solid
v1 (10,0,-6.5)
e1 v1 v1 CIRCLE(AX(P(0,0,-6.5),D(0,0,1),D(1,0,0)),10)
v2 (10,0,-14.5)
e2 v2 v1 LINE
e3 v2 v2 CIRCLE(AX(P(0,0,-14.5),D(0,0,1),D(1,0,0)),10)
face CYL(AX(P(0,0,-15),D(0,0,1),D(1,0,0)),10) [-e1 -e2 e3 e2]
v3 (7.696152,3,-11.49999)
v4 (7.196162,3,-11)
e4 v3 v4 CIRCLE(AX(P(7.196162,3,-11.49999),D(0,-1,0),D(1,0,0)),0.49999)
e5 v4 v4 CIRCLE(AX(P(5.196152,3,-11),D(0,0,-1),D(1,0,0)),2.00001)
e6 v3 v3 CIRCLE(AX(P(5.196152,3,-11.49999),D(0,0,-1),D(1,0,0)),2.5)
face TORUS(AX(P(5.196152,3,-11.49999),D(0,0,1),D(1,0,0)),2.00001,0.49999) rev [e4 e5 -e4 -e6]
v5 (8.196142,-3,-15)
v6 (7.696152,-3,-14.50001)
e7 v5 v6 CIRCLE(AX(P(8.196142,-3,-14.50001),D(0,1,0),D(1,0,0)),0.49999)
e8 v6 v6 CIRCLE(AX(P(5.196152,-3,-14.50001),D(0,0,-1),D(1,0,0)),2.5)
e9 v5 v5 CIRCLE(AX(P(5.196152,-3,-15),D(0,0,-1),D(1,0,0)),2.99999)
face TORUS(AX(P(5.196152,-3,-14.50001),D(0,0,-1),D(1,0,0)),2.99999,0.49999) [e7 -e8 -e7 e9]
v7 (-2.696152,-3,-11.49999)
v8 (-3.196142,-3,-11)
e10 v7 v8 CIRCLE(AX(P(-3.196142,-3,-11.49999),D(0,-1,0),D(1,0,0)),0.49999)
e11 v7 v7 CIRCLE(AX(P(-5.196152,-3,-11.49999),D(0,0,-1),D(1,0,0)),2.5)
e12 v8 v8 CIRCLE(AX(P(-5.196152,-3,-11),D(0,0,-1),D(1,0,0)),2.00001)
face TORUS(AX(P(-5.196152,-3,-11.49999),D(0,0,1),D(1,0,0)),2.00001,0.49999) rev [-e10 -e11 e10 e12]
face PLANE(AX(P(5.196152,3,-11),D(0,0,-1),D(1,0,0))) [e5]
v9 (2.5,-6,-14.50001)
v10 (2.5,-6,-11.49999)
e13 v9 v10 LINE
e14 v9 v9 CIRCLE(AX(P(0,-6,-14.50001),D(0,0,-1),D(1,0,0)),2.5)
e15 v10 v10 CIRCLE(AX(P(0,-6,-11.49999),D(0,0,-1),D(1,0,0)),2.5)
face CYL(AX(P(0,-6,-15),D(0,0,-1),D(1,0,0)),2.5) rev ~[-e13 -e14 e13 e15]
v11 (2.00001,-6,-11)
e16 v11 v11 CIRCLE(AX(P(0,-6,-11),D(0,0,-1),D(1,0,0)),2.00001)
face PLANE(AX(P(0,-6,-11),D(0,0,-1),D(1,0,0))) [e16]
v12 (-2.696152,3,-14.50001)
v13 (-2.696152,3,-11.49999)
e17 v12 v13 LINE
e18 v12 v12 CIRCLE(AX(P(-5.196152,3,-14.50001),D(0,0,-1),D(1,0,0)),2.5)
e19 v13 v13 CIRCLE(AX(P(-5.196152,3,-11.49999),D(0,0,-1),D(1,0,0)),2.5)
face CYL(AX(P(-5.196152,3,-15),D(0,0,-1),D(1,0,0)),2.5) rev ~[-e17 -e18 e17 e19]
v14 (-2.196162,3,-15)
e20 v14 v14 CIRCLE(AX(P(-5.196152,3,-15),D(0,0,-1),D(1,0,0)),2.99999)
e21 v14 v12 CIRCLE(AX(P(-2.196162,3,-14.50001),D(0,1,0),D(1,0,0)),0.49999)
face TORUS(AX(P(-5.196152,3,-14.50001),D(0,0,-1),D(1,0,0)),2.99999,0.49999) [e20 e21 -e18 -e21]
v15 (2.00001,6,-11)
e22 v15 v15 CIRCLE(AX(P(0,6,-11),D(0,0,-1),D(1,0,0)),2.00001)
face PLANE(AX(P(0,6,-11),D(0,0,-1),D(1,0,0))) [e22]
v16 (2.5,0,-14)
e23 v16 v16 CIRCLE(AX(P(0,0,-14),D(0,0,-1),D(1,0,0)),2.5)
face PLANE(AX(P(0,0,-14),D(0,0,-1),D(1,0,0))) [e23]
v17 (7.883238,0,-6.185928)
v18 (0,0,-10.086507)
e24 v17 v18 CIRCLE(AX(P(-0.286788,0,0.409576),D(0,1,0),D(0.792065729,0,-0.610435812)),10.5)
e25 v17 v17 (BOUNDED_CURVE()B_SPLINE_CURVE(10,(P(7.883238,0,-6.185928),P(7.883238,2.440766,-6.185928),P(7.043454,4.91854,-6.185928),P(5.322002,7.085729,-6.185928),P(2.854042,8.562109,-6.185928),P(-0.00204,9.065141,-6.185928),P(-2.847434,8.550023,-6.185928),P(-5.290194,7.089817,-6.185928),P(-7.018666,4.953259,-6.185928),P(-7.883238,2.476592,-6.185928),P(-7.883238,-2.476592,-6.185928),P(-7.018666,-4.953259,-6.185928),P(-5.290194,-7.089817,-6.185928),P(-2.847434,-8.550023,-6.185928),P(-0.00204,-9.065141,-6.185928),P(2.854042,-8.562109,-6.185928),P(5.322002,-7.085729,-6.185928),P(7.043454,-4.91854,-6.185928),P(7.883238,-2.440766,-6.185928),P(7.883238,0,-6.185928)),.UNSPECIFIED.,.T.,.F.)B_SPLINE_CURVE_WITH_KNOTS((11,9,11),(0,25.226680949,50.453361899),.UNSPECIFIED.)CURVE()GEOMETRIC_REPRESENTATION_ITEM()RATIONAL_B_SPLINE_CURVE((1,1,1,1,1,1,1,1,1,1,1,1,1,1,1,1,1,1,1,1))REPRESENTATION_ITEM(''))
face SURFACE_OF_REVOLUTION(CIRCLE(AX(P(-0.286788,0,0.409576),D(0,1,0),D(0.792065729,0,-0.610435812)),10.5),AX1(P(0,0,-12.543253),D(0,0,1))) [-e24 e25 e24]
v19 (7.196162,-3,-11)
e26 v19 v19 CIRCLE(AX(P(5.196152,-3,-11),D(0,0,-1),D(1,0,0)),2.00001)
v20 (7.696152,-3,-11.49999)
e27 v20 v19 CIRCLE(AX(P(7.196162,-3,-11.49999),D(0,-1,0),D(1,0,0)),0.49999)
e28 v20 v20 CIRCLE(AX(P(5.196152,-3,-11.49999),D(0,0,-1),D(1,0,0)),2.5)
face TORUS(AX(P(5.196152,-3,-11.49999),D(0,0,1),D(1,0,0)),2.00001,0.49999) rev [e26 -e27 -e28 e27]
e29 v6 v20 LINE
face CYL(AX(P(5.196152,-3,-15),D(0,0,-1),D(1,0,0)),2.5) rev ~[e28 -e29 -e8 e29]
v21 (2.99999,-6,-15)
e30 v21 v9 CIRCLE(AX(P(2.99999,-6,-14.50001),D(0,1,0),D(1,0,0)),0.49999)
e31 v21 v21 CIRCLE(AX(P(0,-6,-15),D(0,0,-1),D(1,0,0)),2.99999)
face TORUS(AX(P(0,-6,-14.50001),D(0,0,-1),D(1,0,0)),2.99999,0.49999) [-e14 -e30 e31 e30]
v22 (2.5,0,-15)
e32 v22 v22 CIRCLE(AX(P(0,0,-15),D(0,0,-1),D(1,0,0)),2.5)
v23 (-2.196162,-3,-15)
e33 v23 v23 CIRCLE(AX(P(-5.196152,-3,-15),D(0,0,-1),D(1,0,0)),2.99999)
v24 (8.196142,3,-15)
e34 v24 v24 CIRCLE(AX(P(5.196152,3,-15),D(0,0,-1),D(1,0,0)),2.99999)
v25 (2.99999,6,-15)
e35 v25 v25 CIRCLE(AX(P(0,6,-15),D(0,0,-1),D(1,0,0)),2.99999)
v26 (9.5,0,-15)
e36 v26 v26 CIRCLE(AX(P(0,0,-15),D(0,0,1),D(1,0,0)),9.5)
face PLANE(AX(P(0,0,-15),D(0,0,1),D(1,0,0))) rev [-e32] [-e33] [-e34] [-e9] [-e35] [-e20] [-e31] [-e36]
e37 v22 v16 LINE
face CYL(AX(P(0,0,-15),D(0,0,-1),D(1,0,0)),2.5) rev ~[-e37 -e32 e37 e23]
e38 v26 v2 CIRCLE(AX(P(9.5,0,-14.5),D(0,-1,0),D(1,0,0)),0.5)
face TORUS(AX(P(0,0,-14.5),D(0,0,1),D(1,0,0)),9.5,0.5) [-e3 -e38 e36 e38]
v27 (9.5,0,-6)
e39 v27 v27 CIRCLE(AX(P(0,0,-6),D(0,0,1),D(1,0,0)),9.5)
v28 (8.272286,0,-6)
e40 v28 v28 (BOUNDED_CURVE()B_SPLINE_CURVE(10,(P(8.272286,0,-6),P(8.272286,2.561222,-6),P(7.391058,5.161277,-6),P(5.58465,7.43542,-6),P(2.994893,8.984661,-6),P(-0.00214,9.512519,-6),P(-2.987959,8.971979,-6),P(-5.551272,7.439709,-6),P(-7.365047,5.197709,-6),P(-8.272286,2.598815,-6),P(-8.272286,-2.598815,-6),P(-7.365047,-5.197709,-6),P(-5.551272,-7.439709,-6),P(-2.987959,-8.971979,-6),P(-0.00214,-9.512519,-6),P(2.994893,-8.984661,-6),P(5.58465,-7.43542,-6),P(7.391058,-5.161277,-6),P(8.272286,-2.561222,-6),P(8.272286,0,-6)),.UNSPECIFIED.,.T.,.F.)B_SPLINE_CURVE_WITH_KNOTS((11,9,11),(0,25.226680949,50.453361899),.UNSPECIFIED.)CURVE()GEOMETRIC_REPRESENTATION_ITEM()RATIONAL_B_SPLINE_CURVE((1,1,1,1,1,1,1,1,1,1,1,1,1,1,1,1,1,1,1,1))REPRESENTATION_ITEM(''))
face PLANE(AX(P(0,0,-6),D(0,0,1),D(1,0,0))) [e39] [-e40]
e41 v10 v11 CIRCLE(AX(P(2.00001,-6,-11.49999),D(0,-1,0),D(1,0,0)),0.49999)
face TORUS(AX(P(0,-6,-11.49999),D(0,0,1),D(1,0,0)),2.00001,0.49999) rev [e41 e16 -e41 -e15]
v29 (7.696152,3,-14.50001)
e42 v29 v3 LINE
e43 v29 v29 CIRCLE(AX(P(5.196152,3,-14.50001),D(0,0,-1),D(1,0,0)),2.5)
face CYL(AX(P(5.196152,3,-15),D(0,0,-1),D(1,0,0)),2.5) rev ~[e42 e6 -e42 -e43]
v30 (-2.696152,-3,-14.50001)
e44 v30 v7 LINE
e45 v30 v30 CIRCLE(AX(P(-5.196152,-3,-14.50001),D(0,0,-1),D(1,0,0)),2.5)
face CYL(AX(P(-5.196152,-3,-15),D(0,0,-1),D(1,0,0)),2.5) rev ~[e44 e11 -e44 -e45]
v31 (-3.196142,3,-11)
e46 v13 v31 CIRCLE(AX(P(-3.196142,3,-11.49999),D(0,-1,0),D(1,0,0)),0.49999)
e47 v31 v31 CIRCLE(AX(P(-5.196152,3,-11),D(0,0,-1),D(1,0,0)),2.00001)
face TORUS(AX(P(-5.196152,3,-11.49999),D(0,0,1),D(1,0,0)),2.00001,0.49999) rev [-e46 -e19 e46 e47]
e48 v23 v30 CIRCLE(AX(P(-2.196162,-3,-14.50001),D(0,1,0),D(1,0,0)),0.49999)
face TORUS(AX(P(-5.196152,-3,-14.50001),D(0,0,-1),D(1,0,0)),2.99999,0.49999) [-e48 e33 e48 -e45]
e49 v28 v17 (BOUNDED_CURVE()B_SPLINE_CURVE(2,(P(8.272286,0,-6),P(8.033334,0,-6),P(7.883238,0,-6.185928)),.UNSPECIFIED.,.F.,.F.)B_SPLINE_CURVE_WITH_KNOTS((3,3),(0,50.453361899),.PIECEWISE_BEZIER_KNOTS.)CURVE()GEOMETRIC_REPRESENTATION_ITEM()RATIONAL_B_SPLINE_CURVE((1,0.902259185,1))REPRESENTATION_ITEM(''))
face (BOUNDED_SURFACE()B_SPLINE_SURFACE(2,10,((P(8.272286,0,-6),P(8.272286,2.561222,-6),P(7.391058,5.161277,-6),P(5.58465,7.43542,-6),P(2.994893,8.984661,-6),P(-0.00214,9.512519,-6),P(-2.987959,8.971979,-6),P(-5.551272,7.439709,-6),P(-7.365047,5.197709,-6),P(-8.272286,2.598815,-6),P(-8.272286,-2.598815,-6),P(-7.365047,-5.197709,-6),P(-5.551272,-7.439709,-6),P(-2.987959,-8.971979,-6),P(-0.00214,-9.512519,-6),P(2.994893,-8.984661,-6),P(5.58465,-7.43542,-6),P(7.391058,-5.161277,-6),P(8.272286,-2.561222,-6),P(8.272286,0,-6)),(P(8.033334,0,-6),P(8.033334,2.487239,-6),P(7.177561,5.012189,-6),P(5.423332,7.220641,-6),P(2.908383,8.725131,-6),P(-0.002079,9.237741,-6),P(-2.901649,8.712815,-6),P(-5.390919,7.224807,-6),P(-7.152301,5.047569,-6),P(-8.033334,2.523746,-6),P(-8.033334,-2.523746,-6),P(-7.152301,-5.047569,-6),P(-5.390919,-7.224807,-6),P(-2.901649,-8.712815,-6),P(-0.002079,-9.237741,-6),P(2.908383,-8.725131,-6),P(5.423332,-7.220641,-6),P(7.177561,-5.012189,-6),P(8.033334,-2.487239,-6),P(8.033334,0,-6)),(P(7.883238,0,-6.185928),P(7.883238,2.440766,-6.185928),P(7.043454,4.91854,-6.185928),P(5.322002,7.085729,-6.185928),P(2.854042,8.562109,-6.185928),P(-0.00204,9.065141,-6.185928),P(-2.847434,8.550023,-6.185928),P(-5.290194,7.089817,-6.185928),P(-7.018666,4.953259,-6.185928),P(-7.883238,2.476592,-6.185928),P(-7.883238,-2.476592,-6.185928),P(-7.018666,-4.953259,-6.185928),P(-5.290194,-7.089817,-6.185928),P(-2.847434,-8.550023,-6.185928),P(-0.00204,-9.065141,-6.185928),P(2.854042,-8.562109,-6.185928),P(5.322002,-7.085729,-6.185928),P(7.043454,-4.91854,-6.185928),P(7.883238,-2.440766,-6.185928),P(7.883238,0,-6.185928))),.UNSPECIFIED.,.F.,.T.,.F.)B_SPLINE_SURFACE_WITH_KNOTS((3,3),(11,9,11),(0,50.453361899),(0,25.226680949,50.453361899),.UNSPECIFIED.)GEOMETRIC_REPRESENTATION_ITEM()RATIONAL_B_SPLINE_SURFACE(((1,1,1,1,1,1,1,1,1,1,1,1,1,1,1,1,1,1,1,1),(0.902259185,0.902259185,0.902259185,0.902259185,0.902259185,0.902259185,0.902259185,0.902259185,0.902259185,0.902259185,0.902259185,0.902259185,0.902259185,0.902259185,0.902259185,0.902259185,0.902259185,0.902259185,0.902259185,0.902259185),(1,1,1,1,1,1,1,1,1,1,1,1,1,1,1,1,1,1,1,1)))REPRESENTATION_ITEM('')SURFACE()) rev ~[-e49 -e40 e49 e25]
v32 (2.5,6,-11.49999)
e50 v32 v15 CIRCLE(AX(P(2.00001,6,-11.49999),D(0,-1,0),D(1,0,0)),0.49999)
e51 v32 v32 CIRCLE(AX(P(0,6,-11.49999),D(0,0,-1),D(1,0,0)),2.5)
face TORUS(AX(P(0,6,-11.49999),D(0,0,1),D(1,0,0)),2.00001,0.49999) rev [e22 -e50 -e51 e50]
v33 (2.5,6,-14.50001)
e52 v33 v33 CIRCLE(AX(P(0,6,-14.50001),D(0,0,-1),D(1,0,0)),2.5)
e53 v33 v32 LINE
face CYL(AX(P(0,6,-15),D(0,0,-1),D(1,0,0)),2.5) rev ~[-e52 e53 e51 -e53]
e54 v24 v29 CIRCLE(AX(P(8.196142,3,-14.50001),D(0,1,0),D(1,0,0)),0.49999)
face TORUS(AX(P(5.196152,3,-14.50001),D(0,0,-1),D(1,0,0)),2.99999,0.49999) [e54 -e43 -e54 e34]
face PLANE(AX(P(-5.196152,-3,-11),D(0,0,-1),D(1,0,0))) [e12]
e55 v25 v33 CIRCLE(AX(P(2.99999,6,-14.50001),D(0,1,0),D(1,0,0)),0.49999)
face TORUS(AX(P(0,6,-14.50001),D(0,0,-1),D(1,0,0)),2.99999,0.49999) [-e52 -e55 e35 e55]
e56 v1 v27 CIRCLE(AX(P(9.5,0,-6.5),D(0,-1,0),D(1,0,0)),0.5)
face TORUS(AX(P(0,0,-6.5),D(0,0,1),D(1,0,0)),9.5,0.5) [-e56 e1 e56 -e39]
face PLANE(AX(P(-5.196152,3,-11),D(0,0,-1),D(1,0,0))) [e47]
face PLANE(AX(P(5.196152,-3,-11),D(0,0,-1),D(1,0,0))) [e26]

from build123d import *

# Parameters (mm, degrees)
F2_R     = 2.5
F3_DEPTH = 1
F4_R     = 2.5
F5_DEPTH = 4
F6_R     = 0.49999
F7_R     = 0.5


# Not quite as in the source:
# - a fillet or chamfer is up to 0.001 mm smaller than in the source, because OpenCascade refuses the exact size


with BuildPart() as f1:
    # F0 (on Front) → F1 (revolve)
    with BuildSketch(Plane.XZ):
        with BuildLine():
            Line((10, -6), (8.0299019418, -6))
            ThreePointArc((8.0299019418, -6), (4.4755477951, -8.9483166731), (0, -10.0865067004))
            Line((0, -10.0865067004), (0, -15))
            Line((0, -15), (10, -15))
            Line((10, -15), (10, -6))
        make_face()
    revolve(axis=Axis((0, 0, -12.5432533502), (0, 0, 1)))

    # F2 (on face) → F3 (cut)
    with BuildSketch(Plane(origin=(0, 0, -15), x_dir=(1, 0, 0), z_dir=(0, 0, -1))):
        Circle(F2_R)
    extrude(amount=-F3_DEPTH, mode=Mode.SUBTRACT)

    # F4 (on face) → F5 (cut)
    with BuildSketch(Plane(origin=(0, 0, -15), x_dir=(1, 0, 0), z_dir=(0, 0, -1))):
        with Locations((-5.1961524227, 3)):
            Circle(F4_R)
        with Locations((0, 6)):
            Circle(F4_R)
        with Locations((5.1961524227, 3)):
            Circle(F4_R)
        with Locations((5.1961524227, -3)):
            Circle(F4_R)
        with Locations((0, -6)):
            Circle(F4_R)
        with Locations((-5.1961524227, -3)):
            Circle(F4_R)
    extrude(amount=-F5_DEPTH, mode=Mode.SUBTRACT)

    # F6 (radius 0.5 in the source; OpenCascade refuses exactly that, so slightly less here)
    f6_edges = [f1.edges().sort_by_distance(p)[0] for p in [
        (2.696152, 3, -15),
        (-2.5, 6, -15),
        (-7.696152, 3, -15),
        (-7.696152, -3, -15),
        (-2.5, -6, -15),
        (2.696152, -3, -15),
        (2.696152, 3, -11),
        (-2.5, 6, -11),
        (-7.696152, 3, -11),
        (-7.696152, -3, -11),
        (-2.5, -6, -11),
        (2.696152, -3, -11),
    ]]
    fillet(f6_edges, radius=F6_R)

    # F7
    f7_edges = [f1.edges().sort_by_distance(p)[0] for p in [
        (-10, 0, -15),
        (-10, 0, -6),
        (-8.029902, 0, -6),
    ]]
    fillet(f7_edges, radius=F7_R)


solid = f1.part
